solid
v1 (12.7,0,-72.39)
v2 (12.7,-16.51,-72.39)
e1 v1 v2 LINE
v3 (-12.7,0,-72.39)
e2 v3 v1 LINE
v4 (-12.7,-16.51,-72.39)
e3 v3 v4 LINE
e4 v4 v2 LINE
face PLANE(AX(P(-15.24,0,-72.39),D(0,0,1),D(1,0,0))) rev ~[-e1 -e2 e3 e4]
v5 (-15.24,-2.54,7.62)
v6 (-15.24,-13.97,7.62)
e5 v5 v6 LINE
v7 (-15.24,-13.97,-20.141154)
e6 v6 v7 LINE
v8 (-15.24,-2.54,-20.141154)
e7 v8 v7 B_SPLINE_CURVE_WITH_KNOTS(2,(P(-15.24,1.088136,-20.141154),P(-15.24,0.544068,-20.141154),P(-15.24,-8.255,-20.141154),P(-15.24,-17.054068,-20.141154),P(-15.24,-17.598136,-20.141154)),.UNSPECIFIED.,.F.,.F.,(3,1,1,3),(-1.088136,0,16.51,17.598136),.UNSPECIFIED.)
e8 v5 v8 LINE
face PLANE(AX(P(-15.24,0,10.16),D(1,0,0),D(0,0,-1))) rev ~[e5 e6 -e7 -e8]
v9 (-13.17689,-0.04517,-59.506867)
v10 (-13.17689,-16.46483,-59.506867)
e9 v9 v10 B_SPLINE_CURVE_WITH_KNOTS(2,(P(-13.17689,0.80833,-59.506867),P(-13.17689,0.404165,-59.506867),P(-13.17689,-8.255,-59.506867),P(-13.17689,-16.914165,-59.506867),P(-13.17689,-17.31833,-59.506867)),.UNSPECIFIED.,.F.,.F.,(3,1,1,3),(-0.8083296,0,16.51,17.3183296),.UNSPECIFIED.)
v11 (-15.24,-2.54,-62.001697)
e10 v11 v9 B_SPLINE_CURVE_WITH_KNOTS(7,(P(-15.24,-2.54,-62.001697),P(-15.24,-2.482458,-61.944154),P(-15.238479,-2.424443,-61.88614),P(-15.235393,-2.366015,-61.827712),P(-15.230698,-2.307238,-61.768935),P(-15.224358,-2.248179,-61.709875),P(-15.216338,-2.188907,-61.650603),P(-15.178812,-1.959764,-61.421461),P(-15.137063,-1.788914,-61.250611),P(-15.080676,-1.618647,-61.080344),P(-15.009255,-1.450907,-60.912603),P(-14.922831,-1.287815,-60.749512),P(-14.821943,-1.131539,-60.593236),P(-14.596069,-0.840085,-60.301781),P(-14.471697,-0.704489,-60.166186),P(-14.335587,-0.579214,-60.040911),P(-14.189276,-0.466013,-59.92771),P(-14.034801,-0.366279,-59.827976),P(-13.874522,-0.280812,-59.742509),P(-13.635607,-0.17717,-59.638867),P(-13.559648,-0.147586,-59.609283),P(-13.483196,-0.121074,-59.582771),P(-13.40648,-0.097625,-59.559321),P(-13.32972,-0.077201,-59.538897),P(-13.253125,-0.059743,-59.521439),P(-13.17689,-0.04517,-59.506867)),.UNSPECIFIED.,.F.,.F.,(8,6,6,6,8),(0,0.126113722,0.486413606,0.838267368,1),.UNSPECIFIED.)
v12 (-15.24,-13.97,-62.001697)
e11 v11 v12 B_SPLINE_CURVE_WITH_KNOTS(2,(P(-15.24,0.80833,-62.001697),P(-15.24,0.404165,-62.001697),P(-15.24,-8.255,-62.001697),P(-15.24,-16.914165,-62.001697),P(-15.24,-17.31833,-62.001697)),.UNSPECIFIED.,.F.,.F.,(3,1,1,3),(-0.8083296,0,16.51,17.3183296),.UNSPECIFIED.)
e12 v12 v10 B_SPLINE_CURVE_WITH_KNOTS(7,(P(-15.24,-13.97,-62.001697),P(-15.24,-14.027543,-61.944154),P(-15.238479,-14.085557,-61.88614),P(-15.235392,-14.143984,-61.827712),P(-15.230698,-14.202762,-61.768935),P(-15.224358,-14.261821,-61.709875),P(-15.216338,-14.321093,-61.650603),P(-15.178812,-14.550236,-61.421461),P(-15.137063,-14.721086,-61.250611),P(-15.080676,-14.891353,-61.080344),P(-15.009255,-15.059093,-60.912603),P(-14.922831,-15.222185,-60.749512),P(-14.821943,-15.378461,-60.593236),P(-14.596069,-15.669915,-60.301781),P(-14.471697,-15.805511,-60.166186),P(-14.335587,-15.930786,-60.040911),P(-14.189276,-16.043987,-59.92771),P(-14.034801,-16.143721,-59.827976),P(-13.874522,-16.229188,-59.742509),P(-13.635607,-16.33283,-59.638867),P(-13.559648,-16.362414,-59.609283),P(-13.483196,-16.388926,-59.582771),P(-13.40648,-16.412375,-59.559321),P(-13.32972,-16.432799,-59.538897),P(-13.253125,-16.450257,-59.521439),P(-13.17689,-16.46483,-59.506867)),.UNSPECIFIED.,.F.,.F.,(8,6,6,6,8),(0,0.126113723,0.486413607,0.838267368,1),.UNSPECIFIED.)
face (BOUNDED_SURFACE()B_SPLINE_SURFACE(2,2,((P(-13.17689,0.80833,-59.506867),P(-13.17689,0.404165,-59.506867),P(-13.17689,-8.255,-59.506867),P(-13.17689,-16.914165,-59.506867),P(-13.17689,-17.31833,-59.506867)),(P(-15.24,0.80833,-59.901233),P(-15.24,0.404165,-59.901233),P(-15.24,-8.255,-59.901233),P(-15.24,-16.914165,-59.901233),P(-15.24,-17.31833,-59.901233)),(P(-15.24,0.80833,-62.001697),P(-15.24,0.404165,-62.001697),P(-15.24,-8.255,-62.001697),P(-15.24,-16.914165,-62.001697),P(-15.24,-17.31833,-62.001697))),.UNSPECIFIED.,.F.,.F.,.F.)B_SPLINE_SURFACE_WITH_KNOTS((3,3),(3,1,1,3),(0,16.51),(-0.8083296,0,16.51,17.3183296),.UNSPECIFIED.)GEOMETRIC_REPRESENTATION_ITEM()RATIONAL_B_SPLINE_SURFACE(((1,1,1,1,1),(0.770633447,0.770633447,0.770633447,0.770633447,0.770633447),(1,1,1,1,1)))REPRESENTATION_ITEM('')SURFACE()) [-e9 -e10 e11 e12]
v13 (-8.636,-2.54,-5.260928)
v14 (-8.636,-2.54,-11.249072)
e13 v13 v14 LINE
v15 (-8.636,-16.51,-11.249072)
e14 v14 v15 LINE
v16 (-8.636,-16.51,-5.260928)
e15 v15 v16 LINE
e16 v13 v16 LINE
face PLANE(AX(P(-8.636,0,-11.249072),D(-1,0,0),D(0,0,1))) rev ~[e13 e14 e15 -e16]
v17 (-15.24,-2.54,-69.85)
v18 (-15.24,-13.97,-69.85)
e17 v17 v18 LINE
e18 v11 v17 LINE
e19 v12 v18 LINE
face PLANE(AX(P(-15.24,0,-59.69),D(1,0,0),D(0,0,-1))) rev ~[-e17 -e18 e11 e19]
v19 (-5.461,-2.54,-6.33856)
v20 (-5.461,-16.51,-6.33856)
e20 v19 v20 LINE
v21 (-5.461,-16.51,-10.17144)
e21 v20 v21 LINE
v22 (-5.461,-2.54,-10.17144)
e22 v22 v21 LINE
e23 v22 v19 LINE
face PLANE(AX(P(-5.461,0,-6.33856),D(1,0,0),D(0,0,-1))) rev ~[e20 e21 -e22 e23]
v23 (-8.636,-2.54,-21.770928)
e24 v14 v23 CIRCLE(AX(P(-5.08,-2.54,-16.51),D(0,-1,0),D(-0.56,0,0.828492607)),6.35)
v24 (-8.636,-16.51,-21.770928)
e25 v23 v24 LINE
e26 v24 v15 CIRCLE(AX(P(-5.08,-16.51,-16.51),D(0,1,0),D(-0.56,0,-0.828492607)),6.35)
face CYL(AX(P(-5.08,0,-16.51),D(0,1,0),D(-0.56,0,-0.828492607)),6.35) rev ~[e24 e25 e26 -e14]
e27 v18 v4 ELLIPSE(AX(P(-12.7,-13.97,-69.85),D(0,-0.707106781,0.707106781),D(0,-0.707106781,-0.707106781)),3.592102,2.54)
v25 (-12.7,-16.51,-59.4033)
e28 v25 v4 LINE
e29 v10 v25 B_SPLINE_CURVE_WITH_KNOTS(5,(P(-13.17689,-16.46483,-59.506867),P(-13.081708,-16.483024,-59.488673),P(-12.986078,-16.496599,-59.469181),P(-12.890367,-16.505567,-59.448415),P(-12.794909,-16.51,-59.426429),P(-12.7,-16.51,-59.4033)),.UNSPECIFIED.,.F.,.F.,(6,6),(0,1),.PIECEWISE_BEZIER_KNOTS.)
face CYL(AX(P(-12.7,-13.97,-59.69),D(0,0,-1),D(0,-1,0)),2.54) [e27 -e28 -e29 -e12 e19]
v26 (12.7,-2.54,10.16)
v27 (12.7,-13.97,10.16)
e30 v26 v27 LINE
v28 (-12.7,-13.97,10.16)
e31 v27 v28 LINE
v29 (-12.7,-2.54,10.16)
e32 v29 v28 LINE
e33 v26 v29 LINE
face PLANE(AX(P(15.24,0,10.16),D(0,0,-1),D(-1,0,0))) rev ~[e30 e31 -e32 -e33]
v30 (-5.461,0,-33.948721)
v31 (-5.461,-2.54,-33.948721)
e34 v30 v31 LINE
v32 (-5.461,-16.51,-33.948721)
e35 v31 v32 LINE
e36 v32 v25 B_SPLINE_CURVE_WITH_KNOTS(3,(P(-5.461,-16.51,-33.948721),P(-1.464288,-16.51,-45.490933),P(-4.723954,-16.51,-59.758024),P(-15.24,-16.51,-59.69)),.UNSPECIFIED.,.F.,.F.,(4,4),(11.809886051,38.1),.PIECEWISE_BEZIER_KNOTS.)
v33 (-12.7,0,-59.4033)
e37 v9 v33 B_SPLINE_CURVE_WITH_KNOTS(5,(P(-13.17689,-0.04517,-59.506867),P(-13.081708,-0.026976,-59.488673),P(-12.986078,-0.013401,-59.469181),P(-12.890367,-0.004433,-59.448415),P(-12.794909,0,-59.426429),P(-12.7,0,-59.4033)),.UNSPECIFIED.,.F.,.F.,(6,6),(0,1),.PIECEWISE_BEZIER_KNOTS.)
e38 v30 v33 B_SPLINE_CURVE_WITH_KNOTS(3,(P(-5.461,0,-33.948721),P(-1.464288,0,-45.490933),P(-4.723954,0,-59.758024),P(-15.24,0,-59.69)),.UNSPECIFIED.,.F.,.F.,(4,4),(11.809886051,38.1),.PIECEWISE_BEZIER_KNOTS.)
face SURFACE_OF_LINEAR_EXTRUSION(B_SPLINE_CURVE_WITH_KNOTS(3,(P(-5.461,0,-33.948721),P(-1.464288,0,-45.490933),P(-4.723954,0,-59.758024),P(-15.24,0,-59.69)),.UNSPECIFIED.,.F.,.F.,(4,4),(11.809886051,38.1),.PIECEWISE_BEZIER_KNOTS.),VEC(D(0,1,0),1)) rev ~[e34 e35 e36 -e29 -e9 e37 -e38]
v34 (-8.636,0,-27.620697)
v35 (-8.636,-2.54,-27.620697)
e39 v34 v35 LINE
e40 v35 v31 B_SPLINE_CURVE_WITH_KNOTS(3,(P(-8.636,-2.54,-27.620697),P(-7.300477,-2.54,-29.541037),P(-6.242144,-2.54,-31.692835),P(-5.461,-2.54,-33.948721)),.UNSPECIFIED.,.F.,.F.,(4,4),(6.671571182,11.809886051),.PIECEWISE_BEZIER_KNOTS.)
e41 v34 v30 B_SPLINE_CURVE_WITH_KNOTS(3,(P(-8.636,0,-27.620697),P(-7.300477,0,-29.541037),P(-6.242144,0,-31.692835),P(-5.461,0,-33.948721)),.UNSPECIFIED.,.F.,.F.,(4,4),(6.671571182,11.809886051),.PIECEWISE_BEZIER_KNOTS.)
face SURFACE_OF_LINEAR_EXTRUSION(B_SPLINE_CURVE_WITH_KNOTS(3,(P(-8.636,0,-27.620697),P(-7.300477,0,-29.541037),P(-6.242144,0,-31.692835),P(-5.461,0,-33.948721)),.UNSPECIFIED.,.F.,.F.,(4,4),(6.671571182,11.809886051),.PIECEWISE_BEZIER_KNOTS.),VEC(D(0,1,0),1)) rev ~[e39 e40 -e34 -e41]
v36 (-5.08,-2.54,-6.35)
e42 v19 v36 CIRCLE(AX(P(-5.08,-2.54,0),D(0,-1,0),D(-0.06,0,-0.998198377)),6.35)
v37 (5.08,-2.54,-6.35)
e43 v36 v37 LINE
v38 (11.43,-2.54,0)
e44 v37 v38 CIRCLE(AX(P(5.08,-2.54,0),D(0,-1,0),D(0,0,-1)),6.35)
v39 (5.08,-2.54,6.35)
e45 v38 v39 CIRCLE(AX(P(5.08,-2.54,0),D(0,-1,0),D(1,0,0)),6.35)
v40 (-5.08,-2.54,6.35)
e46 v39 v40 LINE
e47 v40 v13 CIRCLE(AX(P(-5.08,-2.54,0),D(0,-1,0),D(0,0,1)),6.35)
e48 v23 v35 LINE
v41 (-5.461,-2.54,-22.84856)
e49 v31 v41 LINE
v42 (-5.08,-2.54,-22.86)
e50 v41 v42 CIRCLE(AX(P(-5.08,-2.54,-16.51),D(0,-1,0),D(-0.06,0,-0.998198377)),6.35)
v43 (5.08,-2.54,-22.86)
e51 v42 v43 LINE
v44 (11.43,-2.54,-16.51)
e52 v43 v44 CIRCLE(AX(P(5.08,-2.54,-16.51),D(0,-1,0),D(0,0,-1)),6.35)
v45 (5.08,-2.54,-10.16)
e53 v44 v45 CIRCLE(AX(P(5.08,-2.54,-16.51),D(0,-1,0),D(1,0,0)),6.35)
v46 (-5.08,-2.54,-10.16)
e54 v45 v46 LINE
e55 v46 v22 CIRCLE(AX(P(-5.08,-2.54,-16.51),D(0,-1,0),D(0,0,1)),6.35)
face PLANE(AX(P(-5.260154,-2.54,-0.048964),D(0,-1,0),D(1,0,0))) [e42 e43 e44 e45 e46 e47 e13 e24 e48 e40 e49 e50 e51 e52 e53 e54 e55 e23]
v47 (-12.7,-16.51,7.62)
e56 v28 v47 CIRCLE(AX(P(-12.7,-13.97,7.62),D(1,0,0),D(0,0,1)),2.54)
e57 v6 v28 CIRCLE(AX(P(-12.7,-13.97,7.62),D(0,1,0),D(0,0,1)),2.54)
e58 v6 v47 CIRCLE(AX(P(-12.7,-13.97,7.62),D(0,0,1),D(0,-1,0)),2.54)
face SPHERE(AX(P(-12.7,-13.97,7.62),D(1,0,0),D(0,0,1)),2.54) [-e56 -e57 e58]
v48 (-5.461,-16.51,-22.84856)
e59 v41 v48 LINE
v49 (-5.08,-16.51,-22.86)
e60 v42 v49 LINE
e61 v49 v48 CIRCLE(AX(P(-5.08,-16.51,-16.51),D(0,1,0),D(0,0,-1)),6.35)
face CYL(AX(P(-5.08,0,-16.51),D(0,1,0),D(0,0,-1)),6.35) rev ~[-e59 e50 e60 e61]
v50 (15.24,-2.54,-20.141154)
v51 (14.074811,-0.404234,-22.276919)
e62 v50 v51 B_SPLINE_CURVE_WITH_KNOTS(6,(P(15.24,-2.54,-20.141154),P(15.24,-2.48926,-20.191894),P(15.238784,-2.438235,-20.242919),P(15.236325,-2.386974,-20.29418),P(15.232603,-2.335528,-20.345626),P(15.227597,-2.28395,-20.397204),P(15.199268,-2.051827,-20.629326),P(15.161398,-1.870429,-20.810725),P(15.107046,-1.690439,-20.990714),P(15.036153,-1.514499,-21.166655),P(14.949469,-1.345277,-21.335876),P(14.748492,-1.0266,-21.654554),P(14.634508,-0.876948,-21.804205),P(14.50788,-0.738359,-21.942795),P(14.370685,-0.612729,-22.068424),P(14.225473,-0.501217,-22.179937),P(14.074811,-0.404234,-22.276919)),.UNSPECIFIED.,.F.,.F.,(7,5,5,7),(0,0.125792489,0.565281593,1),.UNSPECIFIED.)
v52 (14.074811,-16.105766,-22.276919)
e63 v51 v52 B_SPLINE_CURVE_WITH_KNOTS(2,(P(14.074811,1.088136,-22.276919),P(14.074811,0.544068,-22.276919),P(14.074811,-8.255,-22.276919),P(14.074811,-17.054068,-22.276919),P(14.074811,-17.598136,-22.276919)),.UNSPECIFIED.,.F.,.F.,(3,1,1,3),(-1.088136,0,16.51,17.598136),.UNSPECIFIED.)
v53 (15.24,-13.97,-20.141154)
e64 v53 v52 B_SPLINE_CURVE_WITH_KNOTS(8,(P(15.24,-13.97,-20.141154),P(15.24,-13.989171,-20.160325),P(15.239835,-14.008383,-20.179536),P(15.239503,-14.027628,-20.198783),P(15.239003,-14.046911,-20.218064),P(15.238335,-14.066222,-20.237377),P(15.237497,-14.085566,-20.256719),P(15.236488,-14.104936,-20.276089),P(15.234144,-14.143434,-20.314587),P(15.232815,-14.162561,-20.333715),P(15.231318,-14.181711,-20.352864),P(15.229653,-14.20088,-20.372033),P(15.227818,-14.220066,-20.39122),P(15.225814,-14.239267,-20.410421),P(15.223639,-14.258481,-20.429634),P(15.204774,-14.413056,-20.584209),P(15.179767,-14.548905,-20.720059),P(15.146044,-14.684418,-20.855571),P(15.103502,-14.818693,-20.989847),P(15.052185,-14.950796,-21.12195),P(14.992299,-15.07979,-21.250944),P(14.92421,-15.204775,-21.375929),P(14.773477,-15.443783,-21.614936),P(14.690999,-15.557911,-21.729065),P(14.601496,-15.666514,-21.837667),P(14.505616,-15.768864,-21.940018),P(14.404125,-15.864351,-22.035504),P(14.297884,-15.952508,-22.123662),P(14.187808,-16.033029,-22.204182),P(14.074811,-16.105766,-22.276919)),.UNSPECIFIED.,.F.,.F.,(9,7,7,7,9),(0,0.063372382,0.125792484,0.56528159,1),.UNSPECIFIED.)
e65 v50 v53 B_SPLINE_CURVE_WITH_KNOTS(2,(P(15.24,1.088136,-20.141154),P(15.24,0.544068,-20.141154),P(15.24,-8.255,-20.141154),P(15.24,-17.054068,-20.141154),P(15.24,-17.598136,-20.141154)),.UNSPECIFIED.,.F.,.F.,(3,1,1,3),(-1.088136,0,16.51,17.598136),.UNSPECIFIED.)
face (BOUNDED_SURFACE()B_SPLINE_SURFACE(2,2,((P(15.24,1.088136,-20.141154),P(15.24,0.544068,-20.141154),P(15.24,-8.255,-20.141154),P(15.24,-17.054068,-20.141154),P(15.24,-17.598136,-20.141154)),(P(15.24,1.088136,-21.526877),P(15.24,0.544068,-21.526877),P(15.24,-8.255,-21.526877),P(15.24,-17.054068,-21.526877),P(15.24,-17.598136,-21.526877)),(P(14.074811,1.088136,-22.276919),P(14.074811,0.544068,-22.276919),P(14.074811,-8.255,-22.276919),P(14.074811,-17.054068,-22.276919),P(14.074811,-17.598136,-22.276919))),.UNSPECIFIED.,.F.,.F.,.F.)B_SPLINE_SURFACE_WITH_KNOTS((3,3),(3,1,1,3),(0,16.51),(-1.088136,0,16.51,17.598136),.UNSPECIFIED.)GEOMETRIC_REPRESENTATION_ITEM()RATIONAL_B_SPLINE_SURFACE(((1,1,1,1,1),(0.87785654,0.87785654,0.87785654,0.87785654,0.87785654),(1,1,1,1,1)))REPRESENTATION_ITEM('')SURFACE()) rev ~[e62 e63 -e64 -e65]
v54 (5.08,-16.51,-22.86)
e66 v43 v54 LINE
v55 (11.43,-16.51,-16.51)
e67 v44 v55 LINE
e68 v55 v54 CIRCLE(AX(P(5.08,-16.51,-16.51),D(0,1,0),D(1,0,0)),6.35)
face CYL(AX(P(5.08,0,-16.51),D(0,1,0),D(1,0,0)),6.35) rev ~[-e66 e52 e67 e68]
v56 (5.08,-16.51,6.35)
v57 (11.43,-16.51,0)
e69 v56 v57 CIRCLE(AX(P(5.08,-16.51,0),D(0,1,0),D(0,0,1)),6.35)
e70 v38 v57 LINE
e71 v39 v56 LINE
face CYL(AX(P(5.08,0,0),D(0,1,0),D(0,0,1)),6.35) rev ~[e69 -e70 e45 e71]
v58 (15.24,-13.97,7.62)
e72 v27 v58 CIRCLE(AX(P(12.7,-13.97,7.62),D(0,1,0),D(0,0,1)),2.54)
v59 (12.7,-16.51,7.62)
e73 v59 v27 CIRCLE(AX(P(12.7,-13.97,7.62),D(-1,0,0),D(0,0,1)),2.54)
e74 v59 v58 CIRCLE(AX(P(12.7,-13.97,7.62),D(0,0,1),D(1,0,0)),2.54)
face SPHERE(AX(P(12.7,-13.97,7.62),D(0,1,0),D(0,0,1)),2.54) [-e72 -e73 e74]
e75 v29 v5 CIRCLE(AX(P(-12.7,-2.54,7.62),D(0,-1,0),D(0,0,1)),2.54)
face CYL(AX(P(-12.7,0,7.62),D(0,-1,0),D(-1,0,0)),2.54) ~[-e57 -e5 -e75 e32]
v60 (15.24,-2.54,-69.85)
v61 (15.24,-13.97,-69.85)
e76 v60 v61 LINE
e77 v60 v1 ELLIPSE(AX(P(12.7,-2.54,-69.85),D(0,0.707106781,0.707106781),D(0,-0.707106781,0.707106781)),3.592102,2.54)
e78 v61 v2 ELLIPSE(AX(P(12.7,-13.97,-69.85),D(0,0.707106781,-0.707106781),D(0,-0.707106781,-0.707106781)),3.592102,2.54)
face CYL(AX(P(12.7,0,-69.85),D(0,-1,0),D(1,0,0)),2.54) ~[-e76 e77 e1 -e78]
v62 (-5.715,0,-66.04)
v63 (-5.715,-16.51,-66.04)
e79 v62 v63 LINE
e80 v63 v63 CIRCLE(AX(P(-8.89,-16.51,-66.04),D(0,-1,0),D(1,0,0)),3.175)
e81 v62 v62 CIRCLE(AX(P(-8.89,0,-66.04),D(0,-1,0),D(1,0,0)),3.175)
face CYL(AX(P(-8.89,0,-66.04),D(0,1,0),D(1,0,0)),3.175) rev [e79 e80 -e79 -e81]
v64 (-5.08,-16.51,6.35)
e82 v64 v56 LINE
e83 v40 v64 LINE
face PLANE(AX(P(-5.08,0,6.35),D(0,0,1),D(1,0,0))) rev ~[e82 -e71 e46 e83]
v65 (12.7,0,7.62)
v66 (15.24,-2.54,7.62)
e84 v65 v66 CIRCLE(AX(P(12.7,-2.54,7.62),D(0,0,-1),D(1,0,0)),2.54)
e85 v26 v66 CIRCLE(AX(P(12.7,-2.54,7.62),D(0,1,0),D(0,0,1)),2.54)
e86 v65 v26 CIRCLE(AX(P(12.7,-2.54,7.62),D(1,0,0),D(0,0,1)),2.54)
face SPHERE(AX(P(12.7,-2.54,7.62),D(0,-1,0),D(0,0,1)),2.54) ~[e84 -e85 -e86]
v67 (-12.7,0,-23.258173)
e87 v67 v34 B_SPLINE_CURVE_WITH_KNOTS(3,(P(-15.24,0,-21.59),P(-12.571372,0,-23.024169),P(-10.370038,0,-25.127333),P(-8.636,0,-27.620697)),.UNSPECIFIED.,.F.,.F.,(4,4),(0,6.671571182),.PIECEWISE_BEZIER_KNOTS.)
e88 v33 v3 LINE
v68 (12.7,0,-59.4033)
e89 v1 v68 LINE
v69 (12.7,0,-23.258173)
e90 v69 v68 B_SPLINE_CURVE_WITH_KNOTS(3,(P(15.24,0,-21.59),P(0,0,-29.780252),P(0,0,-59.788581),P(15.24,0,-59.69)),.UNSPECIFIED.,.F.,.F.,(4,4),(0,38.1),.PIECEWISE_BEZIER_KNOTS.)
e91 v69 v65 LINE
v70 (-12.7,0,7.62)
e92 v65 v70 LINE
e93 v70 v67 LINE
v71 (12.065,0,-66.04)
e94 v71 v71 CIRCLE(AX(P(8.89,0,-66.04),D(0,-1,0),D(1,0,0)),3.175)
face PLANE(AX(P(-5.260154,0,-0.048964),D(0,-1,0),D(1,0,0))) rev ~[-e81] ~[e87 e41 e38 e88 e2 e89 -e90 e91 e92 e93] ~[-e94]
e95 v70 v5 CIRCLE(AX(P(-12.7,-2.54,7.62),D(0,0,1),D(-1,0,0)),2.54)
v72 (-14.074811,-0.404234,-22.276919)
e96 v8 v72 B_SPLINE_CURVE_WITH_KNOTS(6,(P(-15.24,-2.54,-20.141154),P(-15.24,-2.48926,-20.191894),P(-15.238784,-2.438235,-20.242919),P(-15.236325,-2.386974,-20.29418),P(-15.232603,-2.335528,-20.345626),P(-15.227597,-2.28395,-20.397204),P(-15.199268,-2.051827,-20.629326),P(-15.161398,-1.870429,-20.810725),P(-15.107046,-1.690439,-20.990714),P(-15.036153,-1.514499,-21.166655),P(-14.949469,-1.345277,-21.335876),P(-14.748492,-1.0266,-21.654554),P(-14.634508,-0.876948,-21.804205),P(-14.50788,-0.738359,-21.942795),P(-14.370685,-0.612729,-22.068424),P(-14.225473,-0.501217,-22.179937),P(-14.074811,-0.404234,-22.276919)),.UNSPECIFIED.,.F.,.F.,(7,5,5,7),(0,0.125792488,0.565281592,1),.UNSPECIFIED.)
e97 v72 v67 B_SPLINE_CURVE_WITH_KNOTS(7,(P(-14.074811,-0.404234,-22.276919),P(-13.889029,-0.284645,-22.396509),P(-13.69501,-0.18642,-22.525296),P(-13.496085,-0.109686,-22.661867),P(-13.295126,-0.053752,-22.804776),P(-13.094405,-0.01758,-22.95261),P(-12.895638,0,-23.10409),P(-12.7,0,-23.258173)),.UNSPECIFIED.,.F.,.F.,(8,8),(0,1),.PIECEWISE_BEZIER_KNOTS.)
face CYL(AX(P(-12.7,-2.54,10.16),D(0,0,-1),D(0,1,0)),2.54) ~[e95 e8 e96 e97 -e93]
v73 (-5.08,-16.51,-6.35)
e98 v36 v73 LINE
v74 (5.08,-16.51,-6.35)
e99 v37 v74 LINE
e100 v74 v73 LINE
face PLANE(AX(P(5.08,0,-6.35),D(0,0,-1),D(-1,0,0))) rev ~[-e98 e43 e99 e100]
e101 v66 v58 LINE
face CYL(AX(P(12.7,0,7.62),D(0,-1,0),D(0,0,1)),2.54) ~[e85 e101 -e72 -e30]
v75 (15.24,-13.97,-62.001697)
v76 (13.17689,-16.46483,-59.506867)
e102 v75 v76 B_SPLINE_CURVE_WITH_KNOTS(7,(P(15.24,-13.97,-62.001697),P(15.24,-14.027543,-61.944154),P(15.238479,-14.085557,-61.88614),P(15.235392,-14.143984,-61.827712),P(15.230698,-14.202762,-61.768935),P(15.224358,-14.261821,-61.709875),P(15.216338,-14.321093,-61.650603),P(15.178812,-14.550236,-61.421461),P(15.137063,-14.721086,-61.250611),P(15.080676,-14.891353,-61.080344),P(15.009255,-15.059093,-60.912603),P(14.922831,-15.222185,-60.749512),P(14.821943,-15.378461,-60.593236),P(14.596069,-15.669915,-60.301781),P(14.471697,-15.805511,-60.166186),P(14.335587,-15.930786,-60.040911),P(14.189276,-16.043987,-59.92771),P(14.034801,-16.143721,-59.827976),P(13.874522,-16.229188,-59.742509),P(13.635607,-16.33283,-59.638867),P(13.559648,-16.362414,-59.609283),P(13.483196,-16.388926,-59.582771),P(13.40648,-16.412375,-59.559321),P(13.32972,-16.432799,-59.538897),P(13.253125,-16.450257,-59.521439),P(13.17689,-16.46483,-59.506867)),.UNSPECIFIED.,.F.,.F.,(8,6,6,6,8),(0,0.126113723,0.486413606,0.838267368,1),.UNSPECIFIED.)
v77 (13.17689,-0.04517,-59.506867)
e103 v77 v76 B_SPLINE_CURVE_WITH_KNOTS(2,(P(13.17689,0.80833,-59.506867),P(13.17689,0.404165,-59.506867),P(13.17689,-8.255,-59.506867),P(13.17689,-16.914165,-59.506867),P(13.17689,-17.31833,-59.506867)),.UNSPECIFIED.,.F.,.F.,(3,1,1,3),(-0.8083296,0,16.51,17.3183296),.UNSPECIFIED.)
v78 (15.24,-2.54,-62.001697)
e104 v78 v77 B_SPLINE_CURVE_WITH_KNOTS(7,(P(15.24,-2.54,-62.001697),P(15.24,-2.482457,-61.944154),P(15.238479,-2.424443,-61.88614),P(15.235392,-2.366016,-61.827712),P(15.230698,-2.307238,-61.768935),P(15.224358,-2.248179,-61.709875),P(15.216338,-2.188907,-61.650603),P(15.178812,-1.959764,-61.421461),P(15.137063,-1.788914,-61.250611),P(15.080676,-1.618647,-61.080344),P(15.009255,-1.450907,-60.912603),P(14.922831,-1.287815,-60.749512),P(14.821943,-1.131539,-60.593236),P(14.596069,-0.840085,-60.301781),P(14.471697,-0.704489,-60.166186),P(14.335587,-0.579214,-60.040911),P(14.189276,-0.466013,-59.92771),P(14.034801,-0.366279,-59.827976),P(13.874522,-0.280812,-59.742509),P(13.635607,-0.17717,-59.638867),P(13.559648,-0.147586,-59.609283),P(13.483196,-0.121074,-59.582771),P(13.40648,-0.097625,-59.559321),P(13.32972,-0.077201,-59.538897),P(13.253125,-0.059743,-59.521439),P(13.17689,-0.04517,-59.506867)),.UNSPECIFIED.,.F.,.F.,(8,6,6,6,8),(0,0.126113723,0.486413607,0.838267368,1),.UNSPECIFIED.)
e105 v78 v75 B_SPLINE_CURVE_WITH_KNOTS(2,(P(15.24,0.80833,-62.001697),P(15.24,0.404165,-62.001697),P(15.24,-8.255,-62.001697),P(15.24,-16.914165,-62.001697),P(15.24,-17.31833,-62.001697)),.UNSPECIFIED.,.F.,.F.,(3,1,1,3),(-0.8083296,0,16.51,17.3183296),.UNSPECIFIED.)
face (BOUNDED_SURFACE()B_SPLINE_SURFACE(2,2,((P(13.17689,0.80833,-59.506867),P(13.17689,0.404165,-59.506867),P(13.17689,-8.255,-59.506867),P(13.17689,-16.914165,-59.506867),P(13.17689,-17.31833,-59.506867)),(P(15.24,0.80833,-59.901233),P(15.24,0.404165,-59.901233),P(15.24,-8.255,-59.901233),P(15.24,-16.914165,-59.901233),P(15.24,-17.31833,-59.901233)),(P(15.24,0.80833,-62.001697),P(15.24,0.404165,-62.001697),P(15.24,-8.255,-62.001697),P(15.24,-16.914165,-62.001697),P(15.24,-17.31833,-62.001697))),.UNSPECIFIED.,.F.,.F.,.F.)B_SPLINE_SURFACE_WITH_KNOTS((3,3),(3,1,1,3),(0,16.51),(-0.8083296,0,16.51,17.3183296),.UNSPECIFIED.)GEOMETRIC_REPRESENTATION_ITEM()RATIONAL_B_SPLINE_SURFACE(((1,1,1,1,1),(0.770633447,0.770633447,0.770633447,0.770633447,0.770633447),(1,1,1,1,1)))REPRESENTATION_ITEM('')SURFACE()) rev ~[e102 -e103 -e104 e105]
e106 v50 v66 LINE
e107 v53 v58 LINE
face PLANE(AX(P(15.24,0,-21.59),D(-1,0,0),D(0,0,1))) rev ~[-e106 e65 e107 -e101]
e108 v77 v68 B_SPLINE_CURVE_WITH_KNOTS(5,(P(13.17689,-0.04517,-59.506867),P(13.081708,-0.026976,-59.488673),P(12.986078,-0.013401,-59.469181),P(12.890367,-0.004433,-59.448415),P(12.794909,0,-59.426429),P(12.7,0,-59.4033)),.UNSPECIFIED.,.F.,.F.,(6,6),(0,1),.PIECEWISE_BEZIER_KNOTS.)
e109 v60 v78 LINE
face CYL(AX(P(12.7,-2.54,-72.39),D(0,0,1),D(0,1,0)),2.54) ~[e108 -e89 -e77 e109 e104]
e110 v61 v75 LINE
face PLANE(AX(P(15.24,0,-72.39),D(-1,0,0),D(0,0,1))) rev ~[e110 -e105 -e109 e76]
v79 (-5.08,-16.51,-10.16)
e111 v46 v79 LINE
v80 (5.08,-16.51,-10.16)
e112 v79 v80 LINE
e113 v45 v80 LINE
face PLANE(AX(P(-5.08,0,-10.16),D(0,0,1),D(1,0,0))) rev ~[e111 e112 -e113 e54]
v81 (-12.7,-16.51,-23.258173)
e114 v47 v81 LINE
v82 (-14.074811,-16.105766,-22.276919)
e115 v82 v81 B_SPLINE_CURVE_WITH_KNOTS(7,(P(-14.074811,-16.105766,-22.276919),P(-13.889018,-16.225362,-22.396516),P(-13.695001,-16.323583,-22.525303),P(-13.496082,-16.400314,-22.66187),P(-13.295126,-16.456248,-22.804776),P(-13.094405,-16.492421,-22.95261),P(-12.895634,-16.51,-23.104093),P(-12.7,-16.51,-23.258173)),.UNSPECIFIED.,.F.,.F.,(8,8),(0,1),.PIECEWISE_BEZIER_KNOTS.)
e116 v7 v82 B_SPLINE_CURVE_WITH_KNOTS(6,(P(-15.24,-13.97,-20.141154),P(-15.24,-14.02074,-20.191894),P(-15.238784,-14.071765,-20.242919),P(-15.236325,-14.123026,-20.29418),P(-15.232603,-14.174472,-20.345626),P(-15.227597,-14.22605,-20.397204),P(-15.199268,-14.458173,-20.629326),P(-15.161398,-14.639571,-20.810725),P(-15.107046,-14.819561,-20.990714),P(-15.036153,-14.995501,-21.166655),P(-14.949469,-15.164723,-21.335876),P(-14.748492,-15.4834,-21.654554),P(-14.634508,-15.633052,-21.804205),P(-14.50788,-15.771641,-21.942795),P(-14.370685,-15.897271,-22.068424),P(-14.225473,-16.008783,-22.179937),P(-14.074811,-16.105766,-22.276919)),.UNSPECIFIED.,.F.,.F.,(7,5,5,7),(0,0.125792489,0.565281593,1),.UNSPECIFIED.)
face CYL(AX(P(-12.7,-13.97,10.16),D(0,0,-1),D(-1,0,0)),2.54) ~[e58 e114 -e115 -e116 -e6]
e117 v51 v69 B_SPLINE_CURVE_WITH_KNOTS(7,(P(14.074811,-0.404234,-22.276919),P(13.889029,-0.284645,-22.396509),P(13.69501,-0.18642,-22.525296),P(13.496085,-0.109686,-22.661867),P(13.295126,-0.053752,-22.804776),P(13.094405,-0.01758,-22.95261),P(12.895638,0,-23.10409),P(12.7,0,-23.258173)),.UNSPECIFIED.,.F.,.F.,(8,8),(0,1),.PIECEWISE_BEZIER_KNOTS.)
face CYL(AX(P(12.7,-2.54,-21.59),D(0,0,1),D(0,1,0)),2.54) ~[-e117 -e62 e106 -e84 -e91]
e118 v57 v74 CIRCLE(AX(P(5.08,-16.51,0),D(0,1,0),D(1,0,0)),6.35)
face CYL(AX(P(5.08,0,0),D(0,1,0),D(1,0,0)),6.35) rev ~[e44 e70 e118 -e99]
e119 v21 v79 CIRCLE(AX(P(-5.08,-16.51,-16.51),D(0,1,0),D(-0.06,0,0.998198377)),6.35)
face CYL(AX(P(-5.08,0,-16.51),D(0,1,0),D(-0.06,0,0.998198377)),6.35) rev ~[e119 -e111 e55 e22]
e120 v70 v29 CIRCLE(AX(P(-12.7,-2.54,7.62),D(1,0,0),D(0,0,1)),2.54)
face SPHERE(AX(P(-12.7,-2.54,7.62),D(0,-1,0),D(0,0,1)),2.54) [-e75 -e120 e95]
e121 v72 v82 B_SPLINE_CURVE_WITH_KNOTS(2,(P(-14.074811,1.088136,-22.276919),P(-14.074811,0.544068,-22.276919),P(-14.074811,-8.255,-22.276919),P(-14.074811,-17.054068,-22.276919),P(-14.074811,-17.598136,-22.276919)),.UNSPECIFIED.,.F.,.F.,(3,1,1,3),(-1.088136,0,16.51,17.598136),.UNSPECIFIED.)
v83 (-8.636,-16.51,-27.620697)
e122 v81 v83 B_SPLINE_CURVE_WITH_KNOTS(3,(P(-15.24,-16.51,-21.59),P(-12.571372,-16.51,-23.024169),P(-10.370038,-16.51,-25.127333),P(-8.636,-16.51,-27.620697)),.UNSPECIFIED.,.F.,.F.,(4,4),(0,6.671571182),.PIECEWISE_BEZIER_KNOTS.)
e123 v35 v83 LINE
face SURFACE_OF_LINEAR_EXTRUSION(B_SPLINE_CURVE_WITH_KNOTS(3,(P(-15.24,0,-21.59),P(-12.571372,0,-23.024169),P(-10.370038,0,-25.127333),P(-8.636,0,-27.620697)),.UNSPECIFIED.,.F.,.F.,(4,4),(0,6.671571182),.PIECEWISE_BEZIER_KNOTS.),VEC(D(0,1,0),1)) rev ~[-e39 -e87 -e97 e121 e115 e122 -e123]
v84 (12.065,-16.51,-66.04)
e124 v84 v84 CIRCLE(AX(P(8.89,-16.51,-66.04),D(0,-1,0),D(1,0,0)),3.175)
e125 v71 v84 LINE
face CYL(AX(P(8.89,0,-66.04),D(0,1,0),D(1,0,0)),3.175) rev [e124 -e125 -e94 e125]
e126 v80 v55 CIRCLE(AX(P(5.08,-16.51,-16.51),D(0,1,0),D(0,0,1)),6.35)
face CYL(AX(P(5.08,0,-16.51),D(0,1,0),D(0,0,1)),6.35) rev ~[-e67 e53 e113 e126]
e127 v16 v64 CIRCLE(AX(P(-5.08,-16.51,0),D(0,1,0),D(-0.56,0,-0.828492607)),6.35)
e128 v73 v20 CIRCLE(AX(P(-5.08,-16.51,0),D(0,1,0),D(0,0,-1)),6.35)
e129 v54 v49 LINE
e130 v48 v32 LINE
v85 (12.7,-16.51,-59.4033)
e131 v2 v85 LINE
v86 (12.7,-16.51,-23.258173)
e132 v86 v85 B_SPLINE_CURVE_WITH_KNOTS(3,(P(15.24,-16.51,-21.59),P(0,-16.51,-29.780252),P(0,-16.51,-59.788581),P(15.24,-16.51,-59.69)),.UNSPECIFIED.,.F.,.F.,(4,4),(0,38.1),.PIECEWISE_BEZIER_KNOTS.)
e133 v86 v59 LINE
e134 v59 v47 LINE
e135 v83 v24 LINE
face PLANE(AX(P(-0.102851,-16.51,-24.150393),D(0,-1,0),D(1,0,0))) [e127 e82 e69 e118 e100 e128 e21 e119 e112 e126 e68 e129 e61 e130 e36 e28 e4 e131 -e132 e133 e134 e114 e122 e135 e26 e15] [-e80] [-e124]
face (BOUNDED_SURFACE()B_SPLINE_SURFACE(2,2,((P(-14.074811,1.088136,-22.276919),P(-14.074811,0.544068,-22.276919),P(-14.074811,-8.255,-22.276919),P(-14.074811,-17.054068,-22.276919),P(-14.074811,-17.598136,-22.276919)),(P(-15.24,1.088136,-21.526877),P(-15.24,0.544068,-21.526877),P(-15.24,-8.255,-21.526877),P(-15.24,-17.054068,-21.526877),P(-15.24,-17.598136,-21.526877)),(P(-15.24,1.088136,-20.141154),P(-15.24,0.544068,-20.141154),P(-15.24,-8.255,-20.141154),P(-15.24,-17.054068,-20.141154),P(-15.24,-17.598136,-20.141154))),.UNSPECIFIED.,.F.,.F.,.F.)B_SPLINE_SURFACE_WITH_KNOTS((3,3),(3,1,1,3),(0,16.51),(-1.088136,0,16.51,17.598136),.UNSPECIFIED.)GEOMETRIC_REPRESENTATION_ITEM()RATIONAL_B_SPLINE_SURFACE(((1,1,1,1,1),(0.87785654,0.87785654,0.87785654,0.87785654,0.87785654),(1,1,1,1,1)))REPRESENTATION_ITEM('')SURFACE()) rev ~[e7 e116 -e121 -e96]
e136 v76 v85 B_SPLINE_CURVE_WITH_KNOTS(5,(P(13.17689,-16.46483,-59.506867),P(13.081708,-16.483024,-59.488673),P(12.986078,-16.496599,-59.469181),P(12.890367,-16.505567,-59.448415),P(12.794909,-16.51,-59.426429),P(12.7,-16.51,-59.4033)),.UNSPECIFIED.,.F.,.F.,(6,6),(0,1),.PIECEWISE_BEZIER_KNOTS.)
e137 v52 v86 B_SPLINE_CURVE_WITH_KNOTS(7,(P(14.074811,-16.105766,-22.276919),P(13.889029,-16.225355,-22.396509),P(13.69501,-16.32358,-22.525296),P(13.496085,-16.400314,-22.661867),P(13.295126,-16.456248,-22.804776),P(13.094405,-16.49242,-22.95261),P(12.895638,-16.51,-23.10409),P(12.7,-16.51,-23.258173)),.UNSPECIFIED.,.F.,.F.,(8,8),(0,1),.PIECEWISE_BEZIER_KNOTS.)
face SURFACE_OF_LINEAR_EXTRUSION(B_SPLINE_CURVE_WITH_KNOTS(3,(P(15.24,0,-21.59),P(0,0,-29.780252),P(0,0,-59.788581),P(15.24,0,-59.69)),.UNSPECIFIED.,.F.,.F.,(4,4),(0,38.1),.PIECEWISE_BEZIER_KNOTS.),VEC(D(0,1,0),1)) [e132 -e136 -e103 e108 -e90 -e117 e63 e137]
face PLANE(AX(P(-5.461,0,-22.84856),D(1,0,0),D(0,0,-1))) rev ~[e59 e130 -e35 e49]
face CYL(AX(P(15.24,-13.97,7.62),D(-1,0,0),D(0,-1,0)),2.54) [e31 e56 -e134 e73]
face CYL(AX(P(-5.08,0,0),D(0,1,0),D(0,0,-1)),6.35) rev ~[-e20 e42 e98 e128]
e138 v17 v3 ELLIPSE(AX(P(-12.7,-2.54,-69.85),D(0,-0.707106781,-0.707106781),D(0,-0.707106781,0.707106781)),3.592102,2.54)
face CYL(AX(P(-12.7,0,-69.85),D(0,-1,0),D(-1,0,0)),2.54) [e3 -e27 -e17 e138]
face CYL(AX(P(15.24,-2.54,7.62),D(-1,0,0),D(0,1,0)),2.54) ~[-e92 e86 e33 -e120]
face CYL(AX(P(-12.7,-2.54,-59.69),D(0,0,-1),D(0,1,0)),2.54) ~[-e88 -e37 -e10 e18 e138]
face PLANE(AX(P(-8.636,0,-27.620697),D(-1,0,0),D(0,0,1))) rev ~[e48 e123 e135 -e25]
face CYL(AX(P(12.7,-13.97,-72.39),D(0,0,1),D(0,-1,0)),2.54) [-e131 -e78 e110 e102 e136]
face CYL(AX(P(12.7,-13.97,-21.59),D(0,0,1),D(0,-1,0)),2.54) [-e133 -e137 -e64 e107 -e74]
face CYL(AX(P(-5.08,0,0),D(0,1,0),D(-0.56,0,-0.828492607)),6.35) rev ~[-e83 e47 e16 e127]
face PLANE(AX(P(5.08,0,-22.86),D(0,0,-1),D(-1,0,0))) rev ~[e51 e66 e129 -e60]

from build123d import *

# Parameters (mm, degrees)
F0_R     = 3.175
F1_DEPTH = 16.51
F2_DEPTH = 2.54
F3_R     = 2.54


# Not quite as in the source:
# - a feature names something its author has since deleted; it is built from what else it names


with BuildPart() as f1:
    # F0 (on Front) → F1 (new body)
    with BuildSketch(Plane.XZ):
        with BuildLine():
            Line((15.24, 10.16), (0, 10.16))
            Line((0, 10.16), (-15.24, 10.16))
            Line((-15.24, 10.16), (-15.24, -21.59))
            add(Edge.make_bspline(
                [(-15.24, -21.59), (-12.5713715272, -23.0241692542), (-10.3700381938, -25.1273333514), (-8.636, -27.620696738)],
                knots=[0, 0, 0, 0, 6.6715711821, 6.6715711821, 6.6715711821, 6.6715711821], degree=3))
            Line((-8.636, -27.620696738), (-8.636, -21.770928055))
            ThreePointArc((-8.636, -21.770928055), (-11.43, -16.51), (-8.636, -11.249071945))
            Line((-8.636, -11.249071945), (-8.636, -5.260928055))
            ThreePointArc((-8.636, -5.260928055), (-11.1516304709, 1.8595169871), (-5.08, 6.35))
            Line((-5.08, 6.35), (5.08, 6.35))
            ThreePointArc((5.08, 6.35), (9.5701280605, 4.4901280605), (11.43, 0))
            ThreePointArc((11.43, 0), (9.5701280605, -4.4901280605), (5.08, -6.35))
            Line((5.08, -6.35), (-5.08, -6.35))
            ThreePointArc((-5.08, -6.35), (-5.2705858603, -6.3471392792), (-5.461, -6.3385596944))
            Line((-5.461, -6.3385596944), (-5.461, -10.1714403056))
            ThreePointArc((-5.461, -10.1714403056), (-5.2705858603, -10.1628607208), (-5.08, -10.16))
            Line((-5.08, -10.16), (5.08, -10.16))
            ThreePointArc((5.08, -10.16), (9.5701280605, -12.0198719395), (11.43, -16.51))
            ThreePointArc((11.43, -16.51), (9.5701280605, -21.0001280605), (5.08, -22.86))
            Line((5.08, -22.86), (-5.08, -22.86))
            ThreePointArc((-5.08, -22.86), (-5.2705858603, -22.8571392792), (-5.461, -22.8485596944))
            Line((-5.461, -22.8485596944), (-5.461, -33.9487214282))
            add(Edge.make_bspline(
                [(-5.461, -33.9487214282), (-1.4642877536, -45.4909328609), (-4.7239544203, -59.7580237479), (-15.24, -59.69)],
                knots=[11.8098860506, 11.8098860506, 11.8098860506, 11.8098860506, 38.1, 38.1, 38.1, 38.1], degree=3))
            Line((-15.24, -59.69), (-15.24, -72.39))
            Line((-15.24, -72.39), (15.24, -72.39))
            Line((15.24, -72.39), (15.24, -59.69))
            add(Edge.make_bspline(
                [(15.24, -21.59), (0, -29.7802519053), (0, -59.7885809647), (15.24, -59.69)],
                knots=[0, 0, 0, 0, 38.1, 38.1, 38.1, 38.1], degree=3))
            Line((15.24, -21.59), (15.24, 10.16))
        make_face()
        with Locations((-8.89, -66.04)):
            Circle(F0_R, mode=Mode.SUBTRACT)
        with Locations((8.89, -66.04)):
            Circle(F0_R, mode=Mode.SUBTRACT)
    extrude(amount=F1_DEPTH)

    # F0 (on Front) → F2 (join)
    with BuildSketch(Plane.XZ):
        with BuildLine():
            ThreePointArc((-5.08, 6.35), (-11.1516304709, 1.8595169871), (-8.636, -5.260928055))
            ThreePointArc((-8.636, -5.260928055), (-7.1209102718, -6.0130845048), (-5.461, -6.3385596944))
            ThreePointArc((-5.461, -6.3385596944), (-5.2705858603, -6.3471392792), (-5.08, -6.35))
            ThreePointArc((-5.08, -6.35), (-2.2401936686, -5.6796126628), (0, -3.81))
            ThreePointArc((0, -3.81), (-1.27, 0), (0, 3.81))
            ThreePointArc((0, 3.81), (-2.2401936686, 5.6796126628), (-5.08, 6.35))
        make_face()
        with BuildLine():
            ThreePointArc((5.08, 6.35), (2.2401936686, 5.6796126628), (0, 3.81))
            ThreePointArc((0, 3.81), (0.9441389426, 2.0080463142), (1.27, 0))
            ThreePointArc((1.27, 0), (0.9441389426, -2.0080463142), (0, -3.81))
            ThreePointArc((0, -3.81), (2.2401936686, -5.6796126628), (5.08, -6.35))
            ThreePointArc((5.08, -6.35), (9.5701280605, -4.4901280605), (11.43, 0))
            ThreePointArc((11.43, 0), (9.5701280605, 4.4901280605), (5.08, 6.35))
        make_face()
        with BuildLine():
            Line((5.08, 6.35), (-5.08, 6.35))
            ThreePointArc((-5.08, 6.35), (-2.2401936686, 5.6796126628), (0, 3.81))
            ThreePointArc((0, 3.81), (2.2401936686, 5.6796126628), (5.08, 6.35))
        make_face()
        with BuildLine():
            ThreePointArc((1.27, 0), (0.9441389426, 2.0080463142), (0, 3.81))
            ThreePointArc((0, 3.81), (-1.27, 0), (0, -3.81))
            ThreePointArc((0, -3.81), (0.9441389426, -2.0080463142), (1.27, 0))
        make_face()
        with BuildLine():
            ThreePointArc((0, -3.81), (-2.2401936686, -5.6796126628), (-5.08, -6.35))
            Line((-5.08, -6.35), (5.08, -6.35))
            ThreePointArc((5.08, -6.35), (2.2401936686, -5.6796126628), (0, -3.81))
        make_face()
        with BuildLine():
            Line((-5.461, -22.5981636269), (-5.461, -22.8485596944))
            ThreePointArc((-5.461, -22.8485596944), (-5.2705858603, -22.8571392792), (-5.08, -22.86))
            ThreePointArc((-5.08, -22.86), (-2.2401936686, -22.1896126628), (0, -20.32))
            ThreePointArc((0, -20.32), (-1.27, -16.51), (0, -12.7))
            ThreePointArc((0, -12.7), (-2.2401936686, -10.8303873372), (-5.08, -10.16))
            ThreePointArc((-5.08, -10.16), (-5.2705858603, -10.1628607208), (-5.461, -10.1714403056))
            Line((-5.461, -10.1714403056), (-5.461, -22.5981636269))
        make_face()
        with BuildLine():
            ThreePointArc((0, -12.7), (-1.27, -16.51), (0, -20.32))
            ThreePointArc((0, -20.32), (0.9441389426, -18.5180463142), (1.27, -16.51))
            ThreePointArc((1.27, -16.51), (0.9441389426, -14.5019536858), (0, -12.7))
        make_face()
        with BuildLine():
            Line((5.08, -10.16), (-5.08, -10.16))
            ThreePointArc((-5.08, -10.16), (-2.2401936686, -10.8303873372), (0, -12.7))
            ThreePointArc((0, -12.7), (2.2401936686, -10.8303873372), (5.08, -10.16))
        make_face()
        with BuildLine():
            ThreePointArc((1.27, -16.51), (0.9441389426, -18.5180463142), (0, -20.32))
            ThreePointArc((0, -20.32), (2.2401936686, -22.1896126628), (5.08, -22.86))
            ThreePointArc((5.08, -22.86), (9.5701280605, -21.0001280605), (11.43, -16.51))
            ThreePointArc((11.43, -16.51), (9.5701280605, -12.0198719395), (5.08, -10.16))
            ThreePointArc((5.08, -10.16), (2.2401936686, -10.8303873372), (0, -12.7))
            ThreePointArc((0, -12.7), (0.9441389426, -14.5019536858), (1.27, -16.51))
        make_face()
        with BuildLine():
            ThreePointArc((0, -20.32), (-2.2401936686, -22.1896126628), (-5.08, -22.86))
            Line((-5.08, -22.86), (5.08, -22.86))
            ThreePointArc((5.08, -22.86), (2.2401936686, -22.1896126628), (0, -20.32))
        make_face()
        with BuildLine():
            Line((-8.636, -21.770928055), (-8.636, -27.620696738))
            add(Edge.make_bspline(
                [(-8.636, -27.620696738), (-7.3004773786, -29.5410369116), (-6.2421440453, -31.6928347959), (-5.461, -33.9487214282)],
                knots=[6.6715711821, 6.6715711821, 6.6715711821, 6.6715711821, 11.8098860506, 11.8098860506, 11.8098860506, 11.8098860506], degree=3))
            Line((-5.461, -33.9487214282), (-5.461, -22.8485596944))
            ThreePointArc((-5.461, -22.8485596944), (-7.1209102718, -22.5230845048), (-8.636, -21.770928055))
        make_face()
        with BuildLine():
            Line((-8.636, -5.260928055), (-8.636, -11.249071945))
            ThreePointArc((-8.636, -11.249071945), (-7.1209102718, -10.4969154952), (-5.461, -10.1714403056))
            Line((-5.461, -10.1714403056), (-5.461, -6.3385596944))
            ThreePointArc((-5.461, -6.3385596944), (-7.1209102718, -6.0130845048), (-8.636, -5.260928055))
        make_face()
        with BuildLine():
            ThreePointArc((-8.636, -11.249071945), (-11.43, -16.51), (-8.636, -21.770928055))
            ThreePointArc((-8.636, -21.770928055), (-7.1209102718, -22.5230845048), (-5.461, -22.8485596944))
            Line((-5.461, -22.8485596944), (-5.461, -22.5981636269))
            Line((-5.461, -22.5981636269), (-5.461, -10.1714403056))
            ThreePointArc((-5.461, -10.1714403056), (-7.1209102718, -10.4969154952), (-8.636, -11.249071945))
        make_face()
    extrude(amount=F2_DEPTH)

    # F3
    f3_edges = [f1.edges().sort_by_distance(p)[0] for p in [
        (15.24, -8.255, 10.16),
        (0, -16.51, 10.16),
        (-15.24, -8.255, 10.16),
        (0, 0, 10.16),
        (15.24, -8.255, -21.59),
        (15.24, 0, -5.715),
        (15.24, -16.51, -5.715),
        (-15.24, -8.255, -21.59),
        (-15.24, 0, -5.715),
        (-15.24, -16.51, -5.715),
        (15.24, -8.255, -72.39),
        (15.24, -8.255, -59.69),
        (15.24, 0, -66.04),
        (15.24, -16.51, -66.04),
        (-15.24, -8.255, -59.69),
        (-15.24, -8.255, -72.39),
        (-15.24, 0, -66.04),
        (-15.24, -16.51, -66.04),
    ]]
    fillet(f3_edges, radius=F3_R)


solid = f1.part
